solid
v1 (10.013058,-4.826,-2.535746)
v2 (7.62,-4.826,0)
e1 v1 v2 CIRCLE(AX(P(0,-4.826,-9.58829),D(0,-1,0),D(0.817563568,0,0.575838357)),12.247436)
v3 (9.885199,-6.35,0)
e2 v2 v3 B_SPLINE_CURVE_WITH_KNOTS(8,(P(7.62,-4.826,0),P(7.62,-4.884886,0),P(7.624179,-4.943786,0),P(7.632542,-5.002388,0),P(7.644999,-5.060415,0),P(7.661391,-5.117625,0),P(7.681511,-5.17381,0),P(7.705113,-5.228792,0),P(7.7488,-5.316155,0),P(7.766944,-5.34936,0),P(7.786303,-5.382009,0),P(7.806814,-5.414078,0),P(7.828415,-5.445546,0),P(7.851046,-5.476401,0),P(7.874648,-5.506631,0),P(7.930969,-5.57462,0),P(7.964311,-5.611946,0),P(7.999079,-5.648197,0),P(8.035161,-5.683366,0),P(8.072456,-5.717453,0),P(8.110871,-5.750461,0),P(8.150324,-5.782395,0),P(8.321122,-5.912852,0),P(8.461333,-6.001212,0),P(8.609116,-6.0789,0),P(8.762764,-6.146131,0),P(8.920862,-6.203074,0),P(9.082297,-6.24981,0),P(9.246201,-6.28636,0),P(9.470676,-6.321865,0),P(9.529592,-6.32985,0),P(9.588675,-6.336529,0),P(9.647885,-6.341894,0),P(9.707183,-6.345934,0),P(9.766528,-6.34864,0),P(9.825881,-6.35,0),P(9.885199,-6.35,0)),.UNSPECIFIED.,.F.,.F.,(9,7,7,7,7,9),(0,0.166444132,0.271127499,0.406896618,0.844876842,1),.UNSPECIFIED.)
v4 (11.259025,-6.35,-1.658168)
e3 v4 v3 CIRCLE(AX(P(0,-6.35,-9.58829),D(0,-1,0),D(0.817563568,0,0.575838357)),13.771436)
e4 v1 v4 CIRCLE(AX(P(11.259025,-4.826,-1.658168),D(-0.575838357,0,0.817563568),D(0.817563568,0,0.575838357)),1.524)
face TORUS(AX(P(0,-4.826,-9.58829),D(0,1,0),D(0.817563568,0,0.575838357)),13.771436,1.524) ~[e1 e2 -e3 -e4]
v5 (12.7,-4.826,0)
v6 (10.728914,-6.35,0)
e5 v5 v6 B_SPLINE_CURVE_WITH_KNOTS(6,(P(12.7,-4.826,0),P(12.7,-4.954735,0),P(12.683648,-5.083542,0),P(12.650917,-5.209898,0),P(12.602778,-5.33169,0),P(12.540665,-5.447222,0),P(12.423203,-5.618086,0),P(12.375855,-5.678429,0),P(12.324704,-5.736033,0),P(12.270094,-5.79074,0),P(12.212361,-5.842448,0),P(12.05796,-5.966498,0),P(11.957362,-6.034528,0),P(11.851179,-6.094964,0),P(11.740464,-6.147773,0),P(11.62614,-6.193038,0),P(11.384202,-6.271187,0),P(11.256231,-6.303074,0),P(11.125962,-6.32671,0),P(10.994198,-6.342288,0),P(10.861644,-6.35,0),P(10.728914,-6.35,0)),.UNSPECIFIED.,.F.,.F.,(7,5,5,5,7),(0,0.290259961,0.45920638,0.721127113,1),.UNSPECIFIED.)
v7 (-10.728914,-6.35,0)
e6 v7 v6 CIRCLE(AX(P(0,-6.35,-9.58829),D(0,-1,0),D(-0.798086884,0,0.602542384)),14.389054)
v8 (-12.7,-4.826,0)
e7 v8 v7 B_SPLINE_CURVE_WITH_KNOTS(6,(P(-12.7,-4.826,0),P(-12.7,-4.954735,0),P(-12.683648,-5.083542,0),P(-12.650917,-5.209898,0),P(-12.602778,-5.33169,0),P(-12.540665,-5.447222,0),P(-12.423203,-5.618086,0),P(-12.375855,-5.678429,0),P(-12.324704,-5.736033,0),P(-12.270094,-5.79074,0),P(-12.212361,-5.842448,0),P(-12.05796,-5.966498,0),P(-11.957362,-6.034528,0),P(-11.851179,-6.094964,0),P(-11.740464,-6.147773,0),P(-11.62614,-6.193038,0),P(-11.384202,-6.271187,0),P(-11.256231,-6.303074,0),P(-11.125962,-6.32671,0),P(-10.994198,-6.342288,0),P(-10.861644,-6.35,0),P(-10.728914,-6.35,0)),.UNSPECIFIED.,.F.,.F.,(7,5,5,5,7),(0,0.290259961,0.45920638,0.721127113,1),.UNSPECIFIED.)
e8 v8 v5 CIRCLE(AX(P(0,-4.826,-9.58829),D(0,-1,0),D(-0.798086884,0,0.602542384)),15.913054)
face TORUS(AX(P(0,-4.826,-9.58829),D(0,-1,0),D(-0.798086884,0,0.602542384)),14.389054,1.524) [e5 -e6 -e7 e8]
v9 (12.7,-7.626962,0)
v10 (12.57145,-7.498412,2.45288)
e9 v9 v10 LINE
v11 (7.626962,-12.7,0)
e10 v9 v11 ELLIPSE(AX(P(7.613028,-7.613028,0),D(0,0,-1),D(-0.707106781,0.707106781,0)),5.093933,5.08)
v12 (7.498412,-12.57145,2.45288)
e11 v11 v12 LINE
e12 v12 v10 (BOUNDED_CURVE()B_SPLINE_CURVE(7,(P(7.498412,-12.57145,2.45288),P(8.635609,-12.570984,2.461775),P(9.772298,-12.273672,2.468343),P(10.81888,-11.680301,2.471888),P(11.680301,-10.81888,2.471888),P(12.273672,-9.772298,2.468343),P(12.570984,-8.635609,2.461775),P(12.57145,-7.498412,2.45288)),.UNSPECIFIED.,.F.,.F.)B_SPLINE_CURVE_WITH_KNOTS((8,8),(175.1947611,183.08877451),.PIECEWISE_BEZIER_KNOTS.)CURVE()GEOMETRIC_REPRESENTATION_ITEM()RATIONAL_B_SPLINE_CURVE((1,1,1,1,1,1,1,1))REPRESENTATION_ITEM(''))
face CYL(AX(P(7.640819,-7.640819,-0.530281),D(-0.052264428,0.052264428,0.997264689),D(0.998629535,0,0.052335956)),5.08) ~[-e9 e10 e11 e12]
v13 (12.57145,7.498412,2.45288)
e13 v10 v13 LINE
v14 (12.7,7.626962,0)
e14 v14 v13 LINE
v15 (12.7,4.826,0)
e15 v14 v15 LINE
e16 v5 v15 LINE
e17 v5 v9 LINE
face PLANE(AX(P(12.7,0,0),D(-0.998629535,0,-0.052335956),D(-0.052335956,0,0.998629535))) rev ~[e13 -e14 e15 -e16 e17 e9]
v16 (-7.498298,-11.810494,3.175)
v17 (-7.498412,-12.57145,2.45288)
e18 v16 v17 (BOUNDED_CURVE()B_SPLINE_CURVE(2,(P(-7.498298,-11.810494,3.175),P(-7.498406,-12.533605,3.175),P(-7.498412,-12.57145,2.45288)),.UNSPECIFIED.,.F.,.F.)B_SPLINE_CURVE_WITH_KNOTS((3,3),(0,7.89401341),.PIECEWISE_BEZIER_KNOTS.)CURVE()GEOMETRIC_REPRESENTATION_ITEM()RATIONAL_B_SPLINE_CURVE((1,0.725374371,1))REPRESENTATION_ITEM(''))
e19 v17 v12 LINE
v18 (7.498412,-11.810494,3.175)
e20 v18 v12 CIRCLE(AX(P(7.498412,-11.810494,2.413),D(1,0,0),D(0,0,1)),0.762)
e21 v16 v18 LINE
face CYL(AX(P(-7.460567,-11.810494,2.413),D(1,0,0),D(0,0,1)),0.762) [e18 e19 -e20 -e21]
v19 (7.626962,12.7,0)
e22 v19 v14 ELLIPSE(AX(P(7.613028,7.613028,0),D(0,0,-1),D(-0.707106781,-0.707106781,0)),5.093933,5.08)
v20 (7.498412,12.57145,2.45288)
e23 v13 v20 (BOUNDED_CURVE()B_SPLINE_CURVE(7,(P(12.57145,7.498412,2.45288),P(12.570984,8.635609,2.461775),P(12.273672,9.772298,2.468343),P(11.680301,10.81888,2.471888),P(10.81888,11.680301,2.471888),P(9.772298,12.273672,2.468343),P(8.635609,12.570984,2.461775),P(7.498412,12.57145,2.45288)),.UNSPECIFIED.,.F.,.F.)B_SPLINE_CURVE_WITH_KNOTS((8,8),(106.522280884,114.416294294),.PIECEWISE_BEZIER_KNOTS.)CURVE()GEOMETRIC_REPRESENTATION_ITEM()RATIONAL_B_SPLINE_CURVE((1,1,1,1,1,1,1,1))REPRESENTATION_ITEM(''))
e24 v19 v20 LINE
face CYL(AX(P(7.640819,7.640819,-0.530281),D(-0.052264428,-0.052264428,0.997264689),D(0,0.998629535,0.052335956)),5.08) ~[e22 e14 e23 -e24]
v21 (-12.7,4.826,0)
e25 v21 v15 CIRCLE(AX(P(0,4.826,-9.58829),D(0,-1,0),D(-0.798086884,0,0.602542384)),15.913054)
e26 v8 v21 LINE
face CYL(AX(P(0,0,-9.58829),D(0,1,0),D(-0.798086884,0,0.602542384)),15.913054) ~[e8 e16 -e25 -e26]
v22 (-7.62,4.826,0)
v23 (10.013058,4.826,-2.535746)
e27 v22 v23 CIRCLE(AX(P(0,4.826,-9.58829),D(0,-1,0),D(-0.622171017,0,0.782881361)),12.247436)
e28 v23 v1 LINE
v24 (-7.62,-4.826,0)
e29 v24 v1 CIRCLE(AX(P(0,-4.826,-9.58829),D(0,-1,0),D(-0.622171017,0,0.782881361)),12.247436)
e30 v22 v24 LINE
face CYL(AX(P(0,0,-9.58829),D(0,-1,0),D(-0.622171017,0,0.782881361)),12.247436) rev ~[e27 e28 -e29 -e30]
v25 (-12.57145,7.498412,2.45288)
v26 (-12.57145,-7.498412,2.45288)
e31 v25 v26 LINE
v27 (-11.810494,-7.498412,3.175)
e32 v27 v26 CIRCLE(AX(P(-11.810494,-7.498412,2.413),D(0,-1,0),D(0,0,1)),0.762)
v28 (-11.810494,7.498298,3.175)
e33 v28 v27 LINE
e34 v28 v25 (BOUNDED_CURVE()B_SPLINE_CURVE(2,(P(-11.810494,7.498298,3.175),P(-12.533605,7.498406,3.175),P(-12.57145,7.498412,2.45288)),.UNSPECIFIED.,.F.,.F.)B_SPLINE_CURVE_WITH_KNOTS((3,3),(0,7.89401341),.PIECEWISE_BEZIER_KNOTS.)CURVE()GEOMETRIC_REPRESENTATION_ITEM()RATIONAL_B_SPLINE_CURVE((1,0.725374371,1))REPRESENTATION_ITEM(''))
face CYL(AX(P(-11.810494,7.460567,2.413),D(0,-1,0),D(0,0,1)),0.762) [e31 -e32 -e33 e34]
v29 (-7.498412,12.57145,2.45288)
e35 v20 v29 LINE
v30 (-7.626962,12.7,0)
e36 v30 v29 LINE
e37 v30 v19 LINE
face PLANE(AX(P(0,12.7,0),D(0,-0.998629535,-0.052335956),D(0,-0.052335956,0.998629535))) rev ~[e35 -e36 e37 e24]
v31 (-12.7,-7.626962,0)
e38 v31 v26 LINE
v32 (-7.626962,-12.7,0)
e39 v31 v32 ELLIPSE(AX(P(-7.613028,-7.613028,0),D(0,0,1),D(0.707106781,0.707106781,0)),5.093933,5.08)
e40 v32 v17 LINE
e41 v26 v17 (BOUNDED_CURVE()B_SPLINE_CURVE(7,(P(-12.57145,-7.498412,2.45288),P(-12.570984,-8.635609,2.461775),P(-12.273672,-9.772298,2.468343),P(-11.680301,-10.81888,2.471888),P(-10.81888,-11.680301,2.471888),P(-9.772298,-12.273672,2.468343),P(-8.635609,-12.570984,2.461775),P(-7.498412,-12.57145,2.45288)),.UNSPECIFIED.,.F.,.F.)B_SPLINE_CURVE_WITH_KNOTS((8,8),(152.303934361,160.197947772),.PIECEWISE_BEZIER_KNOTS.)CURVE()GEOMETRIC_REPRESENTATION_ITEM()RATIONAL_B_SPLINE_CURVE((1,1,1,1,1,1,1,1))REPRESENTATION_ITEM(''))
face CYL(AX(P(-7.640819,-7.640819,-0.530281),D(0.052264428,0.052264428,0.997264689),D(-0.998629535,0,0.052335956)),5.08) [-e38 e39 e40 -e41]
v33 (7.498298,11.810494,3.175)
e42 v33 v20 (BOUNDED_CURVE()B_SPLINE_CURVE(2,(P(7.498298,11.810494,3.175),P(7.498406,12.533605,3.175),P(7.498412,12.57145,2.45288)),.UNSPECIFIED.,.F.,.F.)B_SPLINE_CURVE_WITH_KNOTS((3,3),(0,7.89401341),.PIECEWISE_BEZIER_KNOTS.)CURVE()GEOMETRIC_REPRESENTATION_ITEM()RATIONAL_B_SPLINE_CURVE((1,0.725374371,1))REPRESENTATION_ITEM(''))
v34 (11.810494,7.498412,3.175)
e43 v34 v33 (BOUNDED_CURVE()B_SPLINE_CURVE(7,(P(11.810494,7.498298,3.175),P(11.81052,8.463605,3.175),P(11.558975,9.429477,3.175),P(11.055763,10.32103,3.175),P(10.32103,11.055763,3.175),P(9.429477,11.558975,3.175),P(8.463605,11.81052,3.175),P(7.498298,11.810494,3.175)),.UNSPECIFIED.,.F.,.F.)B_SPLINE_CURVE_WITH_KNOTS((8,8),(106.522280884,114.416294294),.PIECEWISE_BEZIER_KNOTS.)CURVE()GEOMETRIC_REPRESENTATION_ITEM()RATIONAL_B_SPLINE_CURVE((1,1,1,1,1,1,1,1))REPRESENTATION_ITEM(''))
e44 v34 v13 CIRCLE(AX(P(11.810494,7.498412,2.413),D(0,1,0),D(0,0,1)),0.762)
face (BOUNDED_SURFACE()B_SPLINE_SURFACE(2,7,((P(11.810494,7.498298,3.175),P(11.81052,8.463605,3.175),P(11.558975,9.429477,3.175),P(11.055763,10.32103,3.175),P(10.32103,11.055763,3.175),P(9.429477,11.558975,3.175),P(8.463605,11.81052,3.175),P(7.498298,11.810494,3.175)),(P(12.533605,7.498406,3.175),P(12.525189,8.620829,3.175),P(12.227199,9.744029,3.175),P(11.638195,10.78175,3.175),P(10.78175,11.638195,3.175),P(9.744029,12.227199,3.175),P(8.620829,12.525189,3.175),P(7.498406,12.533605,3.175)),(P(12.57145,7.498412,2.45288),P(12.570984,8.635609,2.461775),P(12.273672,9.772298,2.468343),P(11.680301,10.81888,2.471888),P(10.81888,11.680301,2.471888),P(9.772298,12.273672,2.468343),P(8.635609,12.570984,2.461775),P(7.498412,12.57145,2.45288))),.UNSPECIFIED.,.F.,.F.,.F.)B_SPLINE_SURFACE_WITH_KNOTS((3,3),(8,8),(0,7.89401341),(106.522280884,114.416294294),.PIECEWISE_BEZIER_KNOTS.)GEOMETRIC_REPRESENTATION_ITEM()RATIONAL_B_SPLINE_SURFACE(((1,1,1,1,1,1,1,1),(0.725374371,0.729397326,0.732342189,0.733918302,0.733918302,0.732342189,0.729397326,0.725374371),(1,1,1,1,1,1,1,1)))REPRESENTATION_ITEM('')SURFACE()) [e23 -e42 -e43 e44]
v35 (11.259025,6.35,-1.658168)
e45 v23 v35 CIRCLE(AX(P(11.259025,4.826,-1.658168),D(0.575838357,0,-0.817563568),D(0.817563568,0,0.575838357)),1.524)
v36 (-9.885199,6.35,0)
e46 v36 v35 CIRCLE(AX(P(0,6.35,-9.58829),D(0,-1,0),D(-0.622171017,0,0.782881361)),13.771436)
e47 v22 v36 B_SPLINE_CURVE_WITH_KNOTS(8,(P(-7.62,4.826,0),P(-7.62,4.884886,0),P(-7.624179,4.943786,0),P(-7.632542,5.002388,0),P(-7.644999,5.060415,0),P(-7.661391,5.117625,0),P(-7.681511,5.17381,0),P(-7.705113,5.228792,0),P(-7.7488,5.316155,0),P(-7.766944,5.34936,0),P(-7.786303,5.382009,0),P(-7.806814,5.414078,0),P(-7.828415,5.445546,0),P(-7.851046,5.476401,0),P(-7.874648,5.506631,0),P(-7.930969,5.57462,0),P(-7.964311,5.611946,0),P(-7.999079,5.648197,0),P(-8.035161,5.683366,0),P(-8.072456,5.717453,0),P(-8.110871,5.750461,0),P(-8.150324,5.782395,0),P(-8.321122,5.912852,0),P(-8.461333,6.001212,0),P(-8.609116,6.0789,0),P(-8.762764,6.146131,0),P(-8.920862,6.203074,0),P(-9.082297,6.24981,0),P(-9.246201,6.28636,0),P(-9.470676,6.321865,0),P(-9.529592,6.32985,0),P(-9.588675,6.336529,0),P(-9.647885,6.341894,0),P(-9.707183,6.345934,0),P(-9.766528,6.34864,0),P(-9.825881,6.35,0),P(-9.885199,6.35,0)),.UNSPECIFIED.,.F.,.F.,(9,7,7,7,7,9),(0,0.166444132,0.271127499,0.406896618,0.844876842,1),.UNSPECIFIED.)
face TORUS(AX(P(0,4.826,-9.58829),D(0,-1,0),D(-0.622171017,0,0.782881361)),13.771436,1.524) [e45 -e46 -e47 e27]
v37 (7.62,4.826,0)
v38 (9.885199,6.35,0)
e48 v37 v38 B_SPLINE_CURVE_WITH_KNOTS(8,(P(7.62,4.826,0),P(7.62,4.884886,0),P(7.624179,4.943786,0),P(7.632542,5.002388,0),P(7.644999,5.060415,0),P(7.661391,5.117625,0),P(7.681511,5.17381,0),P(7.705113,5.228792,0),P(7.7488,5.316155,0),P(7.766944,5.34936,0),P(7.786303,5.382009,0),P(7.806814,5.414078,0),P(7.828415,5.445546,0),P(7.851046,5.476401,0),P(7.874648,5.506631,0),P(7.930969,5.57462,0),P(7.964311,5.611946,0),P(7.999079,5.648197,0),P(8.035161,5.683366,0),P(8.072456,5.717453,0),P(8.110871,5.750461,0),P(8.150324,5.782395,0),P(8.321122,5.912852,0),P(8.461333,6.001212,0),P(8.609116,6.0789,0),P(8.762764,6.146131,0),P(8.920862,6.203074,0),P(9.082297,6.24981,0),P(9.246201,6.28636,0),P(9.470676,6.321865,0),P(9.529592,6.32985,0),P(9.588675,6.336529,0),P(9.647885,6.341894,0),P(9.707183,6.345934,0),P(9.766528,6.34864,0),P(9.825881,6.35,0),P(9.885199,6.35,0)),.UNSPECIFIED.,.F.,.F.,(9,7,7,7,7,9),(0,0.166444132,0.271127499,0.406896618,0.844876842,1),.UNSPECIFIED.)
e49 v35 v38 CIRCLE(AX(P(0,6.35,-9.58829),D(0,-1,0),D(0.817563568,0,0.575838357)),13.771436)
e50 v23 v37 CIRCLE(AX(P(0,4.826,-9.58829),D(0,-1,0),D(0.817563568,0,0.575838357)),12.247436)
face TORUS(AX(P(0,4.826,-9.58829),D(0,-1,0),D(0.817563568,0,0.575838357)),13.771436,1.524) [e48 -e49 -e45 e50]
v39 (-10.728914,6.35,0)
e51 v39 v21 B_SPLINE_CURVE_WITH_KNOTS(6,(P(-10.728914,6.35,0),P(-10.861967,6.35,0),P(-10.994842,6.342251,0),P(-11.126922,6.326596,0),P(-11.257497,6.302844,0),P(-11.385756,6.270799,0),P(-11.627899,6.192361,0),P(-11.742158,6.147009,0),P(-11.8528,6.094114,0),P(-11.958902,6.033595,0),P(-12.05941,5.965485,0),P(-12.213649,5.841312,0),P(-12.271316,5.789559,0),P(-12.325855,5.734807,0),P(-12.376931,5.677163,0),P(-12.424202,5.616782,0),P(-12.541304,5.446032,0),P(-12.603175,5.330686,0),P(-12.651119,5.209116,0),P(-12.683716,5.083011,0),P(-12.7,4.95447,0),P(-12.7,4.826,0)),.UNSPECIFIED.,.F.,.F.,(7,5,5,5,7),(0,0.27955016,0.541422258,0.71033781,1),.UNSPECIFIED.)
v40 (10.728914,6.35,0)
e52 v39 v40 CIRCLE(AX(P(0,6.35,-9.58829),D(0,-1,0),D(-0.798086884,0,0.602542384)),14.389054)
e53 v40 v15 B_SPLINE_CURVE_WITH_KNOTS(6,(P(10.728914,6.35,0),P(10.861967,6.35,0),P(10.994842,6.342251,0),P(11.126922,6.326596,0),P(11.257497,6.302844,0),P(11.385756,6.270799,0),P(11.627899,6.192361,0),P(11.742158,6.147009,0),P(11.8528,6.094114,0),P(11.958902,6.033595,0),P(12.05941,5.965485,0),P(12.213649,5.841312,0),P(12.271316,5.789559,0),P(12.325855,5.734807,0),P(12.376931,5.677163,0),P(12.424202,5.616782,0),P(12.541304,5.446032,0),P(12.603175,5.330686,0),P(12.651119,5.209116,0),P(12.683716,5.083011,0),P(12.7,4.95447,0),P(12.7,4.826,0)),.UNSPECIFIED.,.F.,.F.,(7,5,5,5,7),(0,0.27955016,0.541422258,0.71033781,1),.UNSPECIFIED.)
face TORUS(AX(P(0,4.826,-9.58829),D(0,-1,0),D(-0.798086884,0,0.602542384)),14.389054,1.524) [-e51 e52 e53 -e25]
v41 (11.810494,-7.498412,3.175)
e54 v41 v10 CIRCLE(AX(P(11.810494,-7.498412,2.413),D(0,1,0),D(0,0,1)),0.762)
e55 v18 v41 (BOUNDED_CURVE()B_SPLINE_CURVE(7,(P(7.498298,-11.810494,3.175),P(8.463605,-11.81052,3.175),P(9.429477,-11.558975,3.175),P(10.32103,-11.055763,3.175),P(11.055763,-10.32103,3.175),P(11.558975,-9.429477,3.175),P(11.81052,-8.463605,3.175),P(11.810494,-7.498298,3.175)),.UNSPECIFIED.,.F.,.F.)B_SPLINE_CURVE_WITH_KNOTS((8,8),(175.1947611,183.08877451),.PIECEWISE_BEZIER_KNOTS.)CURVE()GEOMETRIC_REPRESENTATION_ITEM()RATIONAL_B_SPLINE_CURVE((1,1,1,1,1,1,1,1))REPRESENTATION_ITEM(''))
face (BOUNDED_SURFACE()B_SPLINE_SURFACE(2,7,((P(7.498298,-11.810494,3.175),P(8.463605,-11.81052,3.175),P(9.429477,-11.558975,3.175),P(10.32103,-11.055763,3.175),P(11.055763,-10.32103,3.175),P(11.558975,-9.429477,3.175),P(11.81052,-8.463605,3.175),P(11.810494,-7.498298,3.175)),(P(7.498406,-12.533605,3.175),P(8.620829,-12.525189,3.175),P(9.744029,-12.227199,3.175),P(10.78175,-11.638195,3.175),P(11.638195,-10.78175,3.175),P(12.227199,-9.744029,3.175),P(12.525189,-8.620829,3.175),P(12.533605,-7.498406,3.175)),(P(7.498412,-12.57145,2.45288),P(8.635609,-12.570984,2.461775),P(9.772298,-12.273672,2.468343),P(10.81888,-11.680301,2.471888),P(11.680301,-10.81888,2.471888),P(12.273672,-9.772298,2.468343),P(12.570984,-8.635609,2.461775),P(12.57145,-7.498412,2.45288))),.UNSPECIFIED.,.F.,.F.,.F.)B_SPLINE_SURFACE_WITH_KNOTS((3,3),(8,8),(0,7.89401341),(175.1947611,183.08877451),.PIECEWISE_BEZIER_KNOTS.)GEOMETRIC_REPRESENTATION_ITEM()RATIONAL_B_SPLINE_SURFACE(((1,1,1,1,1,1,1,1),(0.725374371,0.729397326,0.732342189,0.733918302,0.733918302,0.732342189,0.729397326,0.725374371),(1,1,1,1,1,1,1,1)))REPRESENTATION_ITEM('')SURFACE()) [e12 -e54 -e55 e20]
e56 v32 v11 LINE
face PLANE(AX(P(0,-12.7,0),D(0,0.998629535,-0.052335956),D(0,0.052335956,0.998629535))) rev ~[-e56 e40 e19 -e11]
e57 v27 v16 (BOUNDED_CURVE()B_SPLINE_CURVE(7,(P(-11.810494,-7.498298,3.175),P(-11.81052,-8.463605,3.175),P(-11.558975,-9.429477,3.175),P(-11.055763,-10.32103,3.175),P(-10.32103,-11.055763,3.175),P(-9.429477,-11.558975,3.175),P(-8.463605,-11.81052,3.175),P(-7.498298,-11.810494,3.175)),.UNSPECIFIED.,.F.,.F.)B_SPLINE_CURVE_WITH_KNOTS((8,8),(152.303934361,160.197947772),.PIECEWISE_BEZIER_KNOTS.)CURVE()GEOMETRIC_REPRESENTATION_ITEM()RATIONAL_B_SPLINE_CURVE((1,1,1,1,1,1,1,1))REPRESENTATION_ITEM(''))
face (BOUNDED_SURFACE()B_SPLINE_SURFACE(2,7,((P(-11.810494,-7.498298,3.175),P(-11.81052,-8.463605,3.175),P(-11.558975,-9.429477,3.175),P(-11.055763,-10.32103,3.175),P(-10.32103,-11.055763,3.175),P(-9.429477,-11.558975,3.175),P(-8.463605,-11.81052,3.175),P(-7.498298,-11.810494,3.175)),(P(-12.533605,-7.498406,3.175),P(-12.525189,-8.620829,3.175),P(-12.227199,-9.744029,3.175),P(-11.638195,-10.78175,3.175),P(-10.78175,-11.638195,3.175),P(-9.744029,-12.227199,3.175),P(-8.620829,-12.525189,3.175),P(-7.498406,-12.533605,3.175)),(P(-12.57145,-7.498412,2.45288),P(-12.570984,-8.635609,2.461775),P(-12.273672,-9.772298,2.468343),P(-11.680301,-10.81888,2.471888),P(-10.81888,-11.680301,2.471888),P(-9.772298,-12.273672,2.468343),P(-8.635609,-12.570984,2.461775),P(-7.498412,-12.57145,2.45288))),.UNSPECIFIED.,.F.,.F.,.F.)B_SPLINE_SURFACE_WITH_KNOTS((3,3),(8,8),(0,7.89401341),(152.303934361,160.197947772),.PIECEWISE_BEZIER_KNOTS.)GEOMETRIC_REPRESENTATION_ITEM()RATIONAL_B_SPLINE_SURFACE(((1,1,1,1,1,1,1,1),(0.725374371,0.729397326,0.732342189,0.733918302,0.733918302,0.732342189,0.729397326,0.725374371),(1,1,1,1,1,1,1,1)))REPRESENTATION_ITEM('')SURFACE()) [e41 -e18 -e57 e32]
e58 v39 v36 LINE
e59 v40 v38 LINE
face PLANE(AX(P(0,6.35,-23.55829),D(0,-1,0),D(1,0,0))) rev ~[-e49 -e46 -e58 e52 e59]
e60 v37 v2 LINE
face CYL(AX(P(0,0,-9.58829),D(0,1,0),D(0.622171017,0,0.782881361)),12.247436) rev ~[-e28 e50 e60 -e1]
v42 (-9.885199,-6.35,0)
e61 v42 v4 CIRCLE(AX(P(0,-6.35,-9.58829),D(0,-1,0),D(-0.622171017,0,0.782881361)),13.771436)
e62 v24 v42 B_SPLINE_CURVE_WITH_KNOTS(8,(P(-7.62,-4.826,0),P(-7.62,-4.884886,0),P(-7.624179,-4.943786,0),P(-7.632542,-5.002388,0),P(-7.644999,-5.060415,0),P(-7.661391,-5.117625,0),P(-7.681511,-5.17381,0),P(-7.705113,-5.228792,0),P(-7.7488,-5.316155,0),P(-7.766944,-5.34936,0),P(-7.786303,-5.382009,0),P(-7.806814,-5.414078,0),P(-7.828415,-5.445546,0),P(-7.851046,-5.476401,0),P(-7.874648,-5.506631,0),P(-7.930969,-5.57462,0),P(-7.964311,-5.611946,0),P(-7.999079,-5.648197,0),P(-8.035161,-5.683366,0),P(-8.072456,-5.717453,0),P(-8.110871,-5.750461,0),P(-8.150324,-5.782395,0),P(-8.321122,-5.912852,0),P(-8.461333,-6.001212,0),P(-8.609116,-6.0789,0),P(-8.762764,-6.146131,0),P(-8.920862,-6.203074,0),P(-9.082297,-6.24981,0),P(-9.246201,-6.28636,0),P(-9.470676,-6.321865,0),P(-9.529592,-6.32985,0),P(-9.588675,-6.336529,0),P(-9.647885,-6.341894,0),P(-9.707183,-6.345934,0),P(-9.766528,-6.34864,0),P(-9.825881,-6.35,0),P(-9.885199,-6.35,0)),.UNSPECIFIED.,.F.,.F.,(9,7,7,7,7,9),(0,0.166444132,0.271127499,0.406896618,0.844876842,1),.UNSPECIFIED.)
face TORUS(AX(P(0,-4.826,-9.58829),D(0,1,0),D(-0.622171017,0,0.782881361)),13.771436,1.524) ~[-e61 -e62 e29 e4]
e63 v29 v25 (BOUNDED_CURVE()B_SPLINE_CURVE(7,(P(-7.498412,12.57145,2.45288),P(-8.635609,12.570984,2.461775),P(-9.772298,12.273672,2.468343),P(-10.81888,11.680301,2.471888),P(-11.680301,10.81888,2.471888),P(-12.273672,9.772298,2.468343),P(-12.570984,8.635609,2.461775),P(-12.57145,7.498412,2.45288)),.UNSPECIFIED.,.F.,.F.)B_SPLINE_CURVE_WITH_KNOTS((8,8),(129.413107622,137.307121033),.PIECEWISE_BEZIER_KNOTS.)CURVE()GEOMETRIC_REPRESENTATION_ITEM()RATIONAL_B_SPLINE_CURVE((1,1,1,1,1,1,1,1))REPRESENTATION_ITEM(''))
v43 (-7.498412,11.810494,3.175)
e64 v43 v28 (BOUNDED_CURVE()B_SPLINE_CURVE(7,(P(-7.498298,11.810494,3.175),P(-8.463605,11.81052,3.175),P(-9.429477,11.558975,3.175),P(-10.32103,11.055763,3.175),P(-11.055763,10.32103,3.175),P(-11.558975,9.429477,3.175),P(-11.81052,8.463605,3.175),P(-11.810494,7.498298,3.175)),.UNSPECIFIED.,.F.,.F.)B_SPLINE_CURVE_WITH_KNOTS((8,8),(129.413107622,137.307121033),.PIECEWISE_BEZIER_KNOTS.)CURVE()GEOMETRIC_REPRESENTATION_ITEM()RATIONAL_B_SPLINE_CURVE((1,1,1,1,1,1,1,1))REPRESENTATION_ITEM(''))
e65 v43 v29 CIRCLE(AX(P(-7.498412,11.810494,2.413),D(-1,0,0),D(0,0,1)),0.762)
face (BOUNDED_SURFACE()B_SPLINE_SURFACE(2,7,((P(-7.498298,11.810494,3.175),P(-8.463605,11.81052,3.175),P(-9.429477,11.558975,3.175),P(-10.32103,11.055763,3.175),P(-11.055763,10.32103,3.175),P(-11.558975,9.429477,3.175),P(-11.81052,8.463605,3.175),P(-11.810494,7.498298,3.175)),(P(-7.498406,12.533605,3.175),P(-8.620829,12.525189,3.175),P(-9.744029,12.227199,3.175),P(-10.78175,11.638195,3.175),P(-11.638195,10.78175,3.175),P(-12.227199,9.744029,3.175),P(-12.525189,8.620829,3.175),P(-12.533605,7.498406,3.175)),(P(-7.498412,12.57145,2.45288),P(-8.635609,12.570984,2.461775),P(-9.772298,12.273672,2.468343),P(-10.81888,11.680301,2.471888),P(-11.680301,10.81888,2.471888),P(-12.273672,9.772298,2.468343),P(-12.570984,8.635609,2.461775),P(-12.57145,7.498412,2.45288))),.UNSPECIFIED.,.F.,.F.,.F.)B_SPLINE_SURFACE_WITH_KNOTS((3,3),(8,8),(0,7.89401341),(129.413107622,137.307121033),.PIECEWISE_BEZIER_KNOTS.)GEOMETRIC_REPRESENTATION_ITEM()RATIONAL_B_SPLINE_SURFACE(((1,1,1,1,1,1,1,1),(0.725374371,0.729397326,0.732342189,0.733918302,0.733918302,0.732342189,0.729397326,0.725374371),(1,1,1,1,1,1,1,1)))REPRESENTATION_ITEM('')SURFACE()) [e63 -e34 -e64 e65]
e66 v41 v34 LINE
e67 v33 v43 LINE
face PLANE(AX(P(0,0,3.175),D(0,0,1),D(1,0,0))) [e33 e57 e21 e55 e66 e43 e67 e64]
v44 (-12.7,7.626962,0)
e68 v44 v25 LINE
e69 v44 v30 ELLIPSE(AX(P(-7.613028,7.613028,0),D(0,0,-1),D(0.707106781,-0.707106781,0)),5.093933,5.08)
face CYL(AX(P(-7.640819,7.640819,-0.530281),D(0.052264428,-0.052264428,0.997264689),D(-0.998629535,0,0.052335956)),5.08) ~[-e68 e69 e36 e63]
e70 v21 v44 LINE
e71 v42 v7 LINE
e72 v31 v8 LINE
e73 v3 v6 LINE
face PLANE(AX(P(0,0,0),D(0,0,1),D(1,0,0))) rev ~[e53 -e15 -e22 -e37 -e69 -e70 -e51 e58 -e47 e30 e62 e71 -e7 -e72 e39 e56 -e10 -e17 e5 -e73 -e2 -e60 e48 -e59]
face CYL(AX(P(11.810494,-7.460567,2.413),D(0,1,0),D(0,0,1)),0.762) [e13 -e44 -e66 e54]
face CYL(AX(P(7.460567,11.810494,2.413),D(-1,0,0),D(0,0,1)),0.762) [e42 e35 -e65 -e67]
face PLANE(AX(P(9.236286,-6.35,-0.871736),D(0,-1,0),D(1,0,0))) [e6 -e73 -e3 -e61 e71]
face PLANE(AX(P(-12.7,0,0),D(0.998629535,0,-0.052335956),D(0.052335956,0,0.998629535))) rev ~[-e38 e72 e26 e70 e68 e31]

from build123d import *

# Parameters (mm, degrees)
F0_W          = 25.4
F0_H          = 25.4
F1_DEPTH      = 3.175
F1_TAPER      = 3
F3_W          = 5.08
F3_H          = 12.7
F6_DEPTH      = 6.35
F6_DEPTH_BACK = 6.35
F7_R          = 5.08
F8_R          = 1.524
F9_R          = 0.762


with BuildPart() as f1:
    # F0 (on Top) → F1 (new body)
    with BuildSketch(Plane.XY):
        Rectangle(F0_W, F0_H)
    extrude(amount=F1_DEPTH, taper=F1_TAPER)

    # F4: sweep along a path in F2
    with BuildLine(Plane.XZ) as f4_path:
        ThreePointArc((-10.16, 0), (0, -23.5582897328), (10.16, 0))
    # F3 (on face) → F4 (sweep)
    with BuildSketch(Plane(origin=(0, 0, 0), x_dir=(1, 0, 0), z_dir=(0, 0, -1))):
        with Locations((-10.16, 0)):
            Rectangle(F3_W, F3_H)
    sweep(path=f4_path.line)

    # F5 (on Front) → F6 (join, two sides)
    with BuildSketch(Plane.XZ) as f6_sk:
        with BuildLine():
            ThreePointArc((7.62, 0), (8.9072265211, -1.1822790439), (10.0130578512, -2.535746045))
            Line((10.0130578512, -2.535746045), (10.16, 0))
            Line((10.16, 0), (7.62, 0))
        make_face()
    extrude(amount=F6_DEPTH)
    extrude(f6_sk.sketch, amount=-F6_DEPTH_BACK)

    # F7
    f7_edges = [f1.edges().sort_by_distance(p)[0] for p in [
        (-12.616803, 12.616803, 1.5875),
        (-12.616803, -12.616803, 1.5875),
        (12.616803, -12.616803, 1.5875),
        (12.616803, 12.616803, 1.5875),
    ]]
    fillet(f7_edges, radius=F7_R)

    # F8
    f8_edges = [f1.edges().sort_by_distance(p)[0] for p in [
        (-1.743325, -6.35, -21.711017),
        (8.907227, -6.35, -1.182279),
        (-1.743325, 6.35, -21.711017),
        (0, -6.35, -25.501344),
        (0, 6.35, -25.501344),
        (8.907227, 6.35, -1.182279),
    ]]
    fillet(f8_edges, radius=F8_R)

    # F9
    f9_edges = [f1.edges().sort_by_distance(p)[0] for p in [
        (12.533605, 0, 3.175),
        (11.048589, -11.048589, 3.175),
        (11.048589, 11.048589, 3.175),
        (0, -12.533605, 3.175),
        (0, 12.533605, 3.175),
        (-11.048589, -11.048589, 3.175),
        (-11.048589, 11.048589, 3.175),
        (-12.533605, 0, 3.175),
    ]]
    fillet(f9_edges, radius=F9_R)


solid = f1.part
